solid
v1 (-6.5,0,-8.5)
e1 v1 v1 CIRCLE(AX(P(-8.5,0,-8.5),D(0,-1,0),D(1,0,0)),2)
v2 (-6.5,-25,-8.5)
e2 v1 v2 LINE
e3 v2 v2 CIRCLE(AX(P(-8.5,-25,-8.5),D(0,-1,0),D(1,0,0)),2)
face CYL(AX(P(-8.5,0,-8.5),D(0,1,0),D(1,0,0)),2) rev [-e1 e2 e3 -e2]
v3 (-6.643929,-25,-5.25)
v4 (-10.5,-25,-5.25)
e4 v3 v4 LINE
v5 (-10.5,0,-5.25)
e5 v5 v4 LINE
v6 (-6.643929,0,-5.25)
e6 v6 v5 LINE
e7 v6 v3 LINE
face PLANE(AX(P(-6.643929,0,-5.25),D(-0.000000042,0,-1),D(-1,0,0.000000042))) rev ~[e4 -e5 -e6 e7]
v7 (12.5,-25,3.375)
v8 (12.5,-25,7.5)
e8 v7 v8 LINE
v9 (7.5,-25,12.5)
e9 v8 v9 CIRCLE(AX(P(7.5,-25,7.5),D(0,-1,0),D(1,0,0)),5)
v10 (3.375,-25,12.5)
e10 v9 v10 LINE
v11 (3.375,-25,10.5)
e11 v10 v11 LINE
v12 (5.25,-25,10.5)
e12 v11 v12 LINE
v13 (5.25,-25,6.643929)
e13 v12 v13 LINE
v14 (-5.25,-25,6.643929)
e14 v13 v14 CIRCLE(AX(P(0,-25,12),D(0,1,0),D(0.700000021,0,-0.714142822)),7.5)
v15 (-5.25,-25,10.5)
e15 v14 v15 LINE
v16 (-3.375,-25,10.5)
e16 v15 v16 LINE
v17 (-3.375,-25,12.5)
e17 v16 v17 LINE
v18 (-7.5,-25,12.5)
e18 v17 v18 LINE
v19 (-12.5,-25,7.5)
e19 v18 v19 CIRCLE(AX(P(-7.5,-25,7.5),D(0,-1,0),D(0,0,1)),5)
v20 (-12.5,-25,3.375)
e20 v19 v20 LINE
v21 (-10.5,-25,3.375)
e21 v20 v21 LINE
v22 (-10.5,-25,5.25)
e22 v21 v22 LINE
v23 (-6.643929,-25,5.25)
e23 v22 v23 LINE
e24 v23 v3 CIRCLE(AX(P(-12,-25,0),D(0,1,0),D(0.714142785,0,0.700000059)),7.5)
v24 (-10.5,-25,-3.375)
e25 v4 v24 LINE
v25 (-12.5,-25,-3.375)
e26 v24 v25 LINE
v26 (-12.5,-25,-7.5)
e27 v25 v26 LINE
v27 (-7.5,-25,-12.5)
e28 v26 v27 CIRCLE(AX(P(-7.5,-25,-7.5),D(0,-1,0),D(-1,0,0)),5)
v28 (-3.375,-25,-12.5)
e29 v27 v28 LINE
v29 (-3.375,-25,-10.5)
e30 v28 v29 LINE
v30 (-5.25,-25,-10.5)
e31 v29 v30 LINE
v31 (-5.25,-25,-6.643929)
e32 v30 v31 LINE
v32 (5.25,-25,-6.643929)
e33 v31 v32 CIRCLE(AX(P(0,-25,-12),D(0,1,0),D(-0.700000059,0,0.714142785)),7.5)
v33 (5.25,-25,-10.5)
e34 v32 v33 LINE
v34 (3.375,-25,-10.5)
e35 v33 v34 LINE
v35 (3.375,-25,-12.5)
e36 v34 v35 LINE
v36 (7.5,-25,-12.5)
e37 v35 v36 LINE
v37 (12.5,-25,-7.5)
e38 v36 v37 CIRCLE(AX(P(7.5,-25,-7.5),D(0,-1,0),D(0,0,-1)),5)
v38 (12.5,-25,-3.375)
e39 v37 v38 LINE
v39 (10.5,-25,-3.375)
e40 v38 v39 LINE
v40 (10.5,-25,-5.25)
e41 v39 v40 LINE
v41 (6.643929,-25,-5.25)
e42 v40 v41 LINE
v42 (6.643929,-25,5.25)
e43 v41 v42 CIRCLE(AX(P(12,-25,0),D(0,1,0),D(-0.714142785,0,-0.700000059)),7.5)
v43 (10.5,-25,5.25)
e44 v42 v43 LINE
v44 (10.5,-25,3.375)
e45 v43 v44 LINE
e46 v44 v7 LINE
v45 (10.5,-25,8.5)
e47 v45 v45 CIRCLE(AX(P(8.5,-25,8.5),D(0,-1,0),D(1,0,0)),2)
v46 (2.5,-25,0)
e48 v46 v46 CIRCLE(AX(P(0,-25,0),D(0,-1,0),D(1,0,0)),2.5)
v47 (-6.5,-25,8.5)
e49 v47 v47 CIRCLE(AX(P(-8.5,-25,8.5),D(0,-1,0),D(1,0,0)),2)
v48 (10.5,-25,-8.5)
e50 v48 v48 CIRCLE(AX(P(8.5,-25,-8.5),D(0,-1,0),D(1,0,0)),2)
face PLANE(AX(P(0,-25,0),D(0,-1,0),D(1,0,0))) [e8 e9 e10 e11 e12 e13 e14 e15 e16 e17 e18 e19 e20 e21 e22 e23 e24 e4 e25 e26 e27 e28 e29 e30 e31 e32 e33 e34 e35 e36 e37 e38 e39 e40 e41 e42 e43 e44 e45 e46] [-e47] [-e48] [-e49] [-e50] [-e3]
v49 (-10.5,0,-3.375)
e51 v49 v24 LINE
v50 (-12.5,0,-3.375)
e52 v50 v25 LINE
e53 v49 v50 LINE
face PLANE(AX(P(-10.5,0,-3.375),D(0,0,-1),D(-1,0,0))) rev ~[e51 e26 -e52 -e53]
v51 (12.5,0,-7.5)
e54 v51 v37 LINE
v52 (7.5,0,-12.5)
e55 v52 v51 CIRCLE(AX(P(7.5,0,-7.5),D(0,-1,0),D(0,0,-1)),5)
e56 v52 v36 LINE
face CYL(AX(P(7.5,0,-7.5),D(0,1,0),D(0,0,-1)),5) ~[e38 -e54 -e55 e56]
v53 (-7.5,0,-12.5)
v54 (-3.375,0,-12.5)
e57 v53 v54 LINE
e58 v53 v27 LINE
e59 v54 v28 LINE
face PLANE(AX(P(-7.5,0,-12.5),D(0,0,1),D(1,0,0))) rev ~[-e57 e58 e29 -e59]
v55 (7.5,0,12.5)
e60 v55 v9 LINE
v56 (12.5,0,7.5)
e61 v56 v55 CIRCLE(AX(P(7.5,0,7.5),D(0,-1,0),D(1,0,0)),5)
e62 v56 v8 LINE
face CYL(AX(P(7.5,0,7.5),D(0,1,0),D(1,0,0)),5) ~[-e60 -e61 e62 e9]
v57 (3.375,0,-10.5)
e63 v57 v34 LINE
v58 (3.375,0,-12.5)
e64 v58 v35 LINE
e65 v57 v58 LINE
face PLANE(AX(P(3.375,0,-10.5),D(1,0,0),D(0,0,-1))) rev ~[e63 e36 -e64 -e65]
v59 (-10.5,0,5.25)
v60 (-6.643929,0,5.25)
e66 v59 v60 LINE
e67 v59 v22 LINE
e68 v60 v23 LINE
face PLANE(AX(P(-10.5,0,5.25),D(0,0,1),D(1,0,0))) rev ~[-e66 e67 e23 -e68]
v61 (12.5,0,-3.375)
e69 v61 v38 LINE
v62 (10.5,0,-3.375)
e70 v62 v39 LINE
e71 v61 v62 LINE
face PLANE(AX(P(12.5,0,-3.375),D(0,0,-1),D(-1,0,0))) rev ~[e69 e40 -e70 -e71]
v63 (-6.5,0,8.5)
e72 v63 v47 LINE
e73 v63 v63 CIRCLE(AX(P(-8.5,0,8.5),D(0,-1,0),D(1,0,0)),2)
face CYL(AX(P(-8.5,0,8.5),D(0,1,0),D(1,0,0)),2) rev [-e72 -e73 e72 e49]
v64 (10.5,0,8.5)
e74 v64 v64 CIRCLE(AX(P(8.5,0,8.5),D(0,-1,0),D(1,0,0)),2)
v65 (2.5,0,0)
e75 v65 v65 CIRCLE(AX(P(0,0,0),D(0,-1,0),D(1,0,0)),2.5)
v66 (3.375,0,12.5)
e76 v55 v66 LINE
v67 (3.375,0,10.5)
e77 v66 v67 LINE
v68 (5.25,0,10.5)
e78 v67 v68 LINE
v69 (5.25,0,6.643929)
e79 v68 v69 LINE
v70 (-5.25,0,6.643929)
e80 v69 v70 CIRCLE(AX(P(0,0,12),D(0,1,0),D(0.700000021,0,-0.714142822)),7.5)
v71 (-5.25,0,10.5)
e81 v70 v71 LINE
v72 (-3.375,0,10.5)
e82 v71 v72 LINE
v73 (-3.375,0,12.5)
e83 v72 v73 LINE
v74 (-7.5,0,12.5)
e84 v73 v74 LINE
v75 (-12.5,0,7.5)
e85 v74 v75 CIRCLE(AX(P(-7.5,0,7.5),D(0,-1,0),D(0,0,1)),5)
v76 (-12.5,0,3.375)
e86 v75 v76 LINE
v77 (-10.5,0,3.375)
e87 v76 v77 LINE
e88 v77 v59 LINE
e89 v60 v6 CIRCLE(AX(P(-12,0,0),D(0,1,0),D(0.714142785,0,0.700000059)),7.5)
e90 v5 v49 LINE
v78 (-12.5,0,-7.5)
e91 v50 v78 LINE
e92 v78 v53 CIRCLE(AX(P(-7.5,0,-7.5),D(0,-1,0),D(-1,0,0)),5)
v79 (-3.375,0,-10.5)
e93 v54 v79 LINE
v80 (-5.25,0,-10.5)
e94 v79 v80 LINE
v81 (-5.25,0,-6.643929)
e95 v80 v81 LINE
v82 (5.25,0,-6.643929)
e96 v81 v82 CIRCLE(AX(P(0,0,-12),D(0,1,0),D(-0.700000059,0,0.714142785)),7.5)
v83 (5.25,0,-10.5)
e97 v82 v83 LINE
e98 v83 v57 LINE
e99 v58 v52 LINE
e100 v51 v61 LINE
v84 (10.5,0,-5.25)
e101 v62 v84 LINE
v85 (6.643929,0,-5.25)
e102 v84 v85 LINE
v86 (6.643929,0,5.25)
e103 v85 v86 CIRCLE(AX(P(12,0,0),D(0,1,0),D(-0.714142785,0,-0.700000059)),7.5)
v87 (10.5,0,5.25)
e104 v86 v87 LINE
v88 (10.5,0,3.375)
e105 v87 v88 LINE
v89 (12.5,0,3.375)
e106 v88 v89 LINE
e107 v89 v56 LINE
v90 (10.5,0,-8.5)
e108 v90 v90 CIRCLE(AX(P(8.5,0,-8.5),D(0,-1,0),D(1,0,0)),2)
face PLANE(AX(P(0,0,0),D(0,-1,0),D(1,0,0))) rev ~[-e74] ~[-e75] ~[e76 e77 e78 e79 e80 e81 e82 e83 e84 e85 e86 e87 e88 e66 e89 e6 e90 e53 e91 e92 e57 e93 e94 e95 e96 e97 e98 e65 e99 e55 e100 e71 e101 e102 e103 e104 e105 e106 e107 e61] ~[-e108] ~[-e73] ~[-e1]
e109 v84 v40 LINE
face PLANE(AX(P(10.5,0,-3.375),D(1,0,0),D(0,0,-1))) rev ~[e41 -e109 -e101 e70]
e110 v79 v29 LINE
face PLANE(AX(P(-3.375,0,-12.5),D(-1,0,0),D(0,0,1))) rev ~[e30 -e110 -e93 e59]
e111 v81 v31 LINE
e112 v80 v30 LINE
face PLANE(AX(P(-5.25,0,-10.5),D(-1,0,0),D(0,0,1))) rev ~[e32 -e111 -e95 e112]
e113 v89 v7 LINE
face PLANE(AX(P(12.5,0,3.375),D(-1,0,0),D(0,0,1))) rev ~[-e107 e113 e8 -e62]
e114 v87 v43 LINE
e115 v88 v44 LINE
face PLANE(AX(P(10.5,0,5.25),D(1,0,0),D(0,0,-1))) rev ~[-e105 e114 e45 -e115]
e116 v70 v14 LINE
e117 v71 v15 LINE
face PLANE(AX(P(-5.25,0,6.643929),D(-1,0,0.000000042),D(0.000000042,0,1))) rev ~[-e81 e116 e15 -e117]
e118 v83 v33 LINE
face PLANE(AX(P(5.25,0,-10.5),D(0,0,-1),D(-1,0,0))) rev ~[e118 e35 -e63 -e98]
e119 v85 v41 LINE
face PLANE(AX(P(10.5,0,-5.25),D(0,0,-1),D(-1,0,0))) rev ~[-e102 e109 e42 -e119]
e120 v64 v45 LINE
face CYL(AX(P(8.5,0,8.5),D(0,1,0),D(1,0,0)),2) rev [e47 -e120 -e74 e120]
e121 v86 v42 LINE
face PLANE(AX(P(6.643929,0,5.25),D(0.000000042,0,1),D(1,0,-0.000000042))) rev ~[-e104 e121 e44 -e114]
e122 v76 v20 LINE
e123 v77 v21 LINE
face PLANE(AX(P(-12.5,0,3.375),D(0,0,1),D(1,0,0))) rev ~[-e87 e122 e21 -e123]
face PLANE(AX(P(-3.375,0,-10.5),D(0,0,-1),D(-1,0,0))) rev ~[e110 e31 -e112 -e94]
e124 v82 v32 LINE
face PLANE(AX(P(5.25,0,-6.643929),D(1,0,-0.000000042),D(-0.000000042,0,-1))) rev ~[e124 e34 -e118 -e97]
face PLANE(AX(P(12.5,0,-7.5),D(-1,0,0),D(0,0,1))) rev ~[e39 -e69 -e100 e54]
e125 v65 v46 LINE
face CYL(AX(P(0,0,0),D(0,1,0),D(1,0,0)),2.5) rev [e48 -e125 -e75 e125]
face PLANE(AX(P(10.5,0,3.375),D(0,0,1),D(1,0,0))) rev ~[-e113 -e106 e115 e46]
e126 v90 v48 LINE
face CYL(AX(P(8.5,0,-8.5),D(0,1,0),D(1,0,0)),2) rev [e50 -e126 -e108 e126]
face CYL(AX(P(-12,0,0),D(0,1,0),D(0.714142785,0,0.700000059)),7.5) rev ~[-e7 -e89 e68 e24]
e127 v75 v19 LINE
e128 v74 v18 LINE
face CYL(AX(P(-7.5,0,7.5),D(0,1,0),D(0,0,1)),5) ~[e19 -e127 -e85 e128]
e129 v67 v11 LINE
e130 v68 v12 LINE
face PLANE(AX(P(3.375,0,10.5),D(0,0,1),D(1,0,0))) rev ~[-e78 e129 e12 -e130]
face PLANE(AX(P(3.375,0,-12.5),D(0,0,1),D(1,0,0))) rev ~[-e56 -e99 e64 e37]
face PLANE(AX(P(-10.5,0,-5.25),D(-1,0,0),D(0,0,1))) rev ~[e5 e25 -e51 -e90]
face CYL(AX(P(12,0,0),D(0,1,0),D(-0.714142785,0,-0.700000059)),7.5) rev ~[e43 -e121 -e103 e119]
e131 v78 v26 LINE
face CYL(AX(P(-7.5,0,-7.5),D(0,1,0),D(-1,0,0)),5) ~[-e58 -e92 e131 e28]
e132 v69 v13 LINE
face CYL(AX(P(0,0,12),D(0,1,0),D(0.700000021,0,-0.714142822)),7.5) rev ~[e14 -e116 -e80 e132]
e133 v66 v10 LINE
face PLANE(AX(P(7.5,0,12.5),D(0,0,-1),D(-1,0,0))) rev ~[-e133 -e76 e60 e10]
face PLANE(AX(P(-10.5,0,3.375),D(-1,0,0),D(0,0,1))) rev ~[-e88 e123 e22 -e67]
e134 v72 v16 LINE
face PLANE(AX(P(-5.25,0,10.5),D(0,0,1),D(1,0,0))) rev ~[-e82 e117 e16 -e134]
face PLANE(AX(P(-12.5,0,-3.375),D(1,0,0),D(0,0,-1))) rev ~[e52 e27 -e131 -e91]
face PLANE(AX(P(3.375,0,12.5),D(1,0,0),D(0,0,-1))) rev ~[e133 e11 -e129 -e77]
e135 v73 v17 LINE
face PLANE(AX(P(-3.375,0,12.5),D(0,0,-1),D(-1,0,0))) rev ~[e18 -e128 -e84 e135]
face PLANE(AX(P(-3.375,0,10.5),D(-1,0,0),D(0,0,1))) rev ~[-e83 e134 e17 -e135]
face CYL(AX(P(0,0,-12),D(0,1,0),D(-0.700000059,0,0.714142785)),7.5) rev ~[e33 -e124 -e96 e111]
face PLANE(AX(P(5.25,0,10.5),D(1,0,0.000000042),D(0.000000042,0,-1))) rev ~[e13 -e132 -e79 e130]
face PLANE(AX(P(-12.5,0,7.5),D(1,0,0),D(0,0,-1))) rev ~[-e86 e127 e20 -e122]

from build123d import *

# Parameters (mm, degrees)
F0_R     = 2
F0_R_2   = 2.5
F2_DEPTH = 25


# Not quite as in the source:
# - ends of sketch curves that miss each other by under 0.0002 mm in the source are joined


with BuildPart() as f2:
    # F0 (on Front) → F2 (new body)
    with BuildSketch(Plane.XZ):
        with BuildLine():
            ThreePointArc((5.2500001607, 6.6439288361), (0, 4.5), (-5.2500001607, 6.6439288361))
            Line((-5.2500001607, 6.6439288361), (-5.25, 10.5))
            Line((-5.25, 10.5), (-3.375, 10.5))
            Line((-3.375, 10.5), (-3.375, 12.5))
            Line((-3.375, 12.5), (-7.5, 12.5))
            ThreePointArc((-7.5, 12.5), (-11.0355339059, 11.0355339059), (-12.5, 7.5))
            Line((-12.5, 7.5), (-12.5, 3.375))
            Line((-12.5, 3.375), (-10.5, 3.375))
            Line((-10.5, 3.375), (-10.5, 5.25))
            Line((-10.5, 5.25), (-6.643929, 5.25))
            ThreePointArc((-6.643929, 5.25), (-4.5, 0), (-6.6439288361, -5.2500001607))
            Line((-6.6439288361, -5.2500001607), (-10.5, -5.25))
            Line((-10.5, -5.25), (-10.5, -3.375))
            Line((-10.5, -3.375), (-12.5, -3.375))
            Line((-12.5, -3.375), (-12.5, -7.5))
            ThreePointArc((-12.5, -7.5), (-11.0355339059, -11.0355339059), (-7.5, -12.5))
            Line((-7.5, -12.5), (-3.375, -12.5))
            Line((-3.375, -12.5), (-3.375, -10.5))
            Line((-3.375, -10.5), (-5.25, -10.5))
            Line((-5.25, -10.5), (-5.25, -6.643929))
            ThreePointArc((-5.25, -6.643929), (0, -4.5), (5.2500001607, -6.6439288361))
            Line((5.2500001607, -6.6439288361), (5.25, -10.5))
            Line((5.25, -10.5), (3.375, -10.5))
            Line((3.375, -10.5), (3.375, -12.5))
            Line((3.375, -12.5), (7.5, -12.5))
            ThreePointArc((7.5, -12.5), (11.0355339059, -11.0355339059), (12.5, -7.5))
            Line((12.5, -7.5), (12.5, -3.375))
            Line((12.5, -3.375), (10.5, -3.375))
            Line((10.5, -3.375), (10.5, -5.25))
            Line((10.5, -5.25), (6.643929, -5.25))
            ThreePointArc((6.643929, -5.25), (4.5, 0), (6.6439288361, 5.2500001607))
            Line((6.6439288361, 5.2500001607), (10.5, 5.25))
            Line((10.5, 5.25), (10.5, 3.375))
            Line((10.5, 3.375), (12.5, 3.375))
            Line((12.5, 3.375), (12.5, 7.5))
            ThreePointArc((12.5, 7.5), (11.0355339059, 11.0355339059), (7.5, 12.5))
            Line((7.5, 12.5), (3.375, 12.5))
            Line((3.375, 12.5), (3.375, 10.5))
            Line((3.375, 10.5), (5.25, 10.5))
            Line((5.25, 10.5), (5.2500001607, 6.6439288361))
        make_face()
        with Locations((-8.5, -8.5)):
            Circle(F0_R, mode=Mode.SUBTRACT)
        with Locations((8.5, -8.5)):
            Circle(F0_R, mode=Mode.SUBTRACT)
        with Locations((-8.5, 8.5)):
            Circle(F0_R, mode=Mode.SUBTRACT)
        Circle(F0_R_2, mode=Mode.SUBTRACT)
        with Locations((8.5, 8.5)):
            Circle(F0_R, mode=Mode.SUBTRACT)
    extrude(amount=F2_DEPTH)


solid = f2.part
